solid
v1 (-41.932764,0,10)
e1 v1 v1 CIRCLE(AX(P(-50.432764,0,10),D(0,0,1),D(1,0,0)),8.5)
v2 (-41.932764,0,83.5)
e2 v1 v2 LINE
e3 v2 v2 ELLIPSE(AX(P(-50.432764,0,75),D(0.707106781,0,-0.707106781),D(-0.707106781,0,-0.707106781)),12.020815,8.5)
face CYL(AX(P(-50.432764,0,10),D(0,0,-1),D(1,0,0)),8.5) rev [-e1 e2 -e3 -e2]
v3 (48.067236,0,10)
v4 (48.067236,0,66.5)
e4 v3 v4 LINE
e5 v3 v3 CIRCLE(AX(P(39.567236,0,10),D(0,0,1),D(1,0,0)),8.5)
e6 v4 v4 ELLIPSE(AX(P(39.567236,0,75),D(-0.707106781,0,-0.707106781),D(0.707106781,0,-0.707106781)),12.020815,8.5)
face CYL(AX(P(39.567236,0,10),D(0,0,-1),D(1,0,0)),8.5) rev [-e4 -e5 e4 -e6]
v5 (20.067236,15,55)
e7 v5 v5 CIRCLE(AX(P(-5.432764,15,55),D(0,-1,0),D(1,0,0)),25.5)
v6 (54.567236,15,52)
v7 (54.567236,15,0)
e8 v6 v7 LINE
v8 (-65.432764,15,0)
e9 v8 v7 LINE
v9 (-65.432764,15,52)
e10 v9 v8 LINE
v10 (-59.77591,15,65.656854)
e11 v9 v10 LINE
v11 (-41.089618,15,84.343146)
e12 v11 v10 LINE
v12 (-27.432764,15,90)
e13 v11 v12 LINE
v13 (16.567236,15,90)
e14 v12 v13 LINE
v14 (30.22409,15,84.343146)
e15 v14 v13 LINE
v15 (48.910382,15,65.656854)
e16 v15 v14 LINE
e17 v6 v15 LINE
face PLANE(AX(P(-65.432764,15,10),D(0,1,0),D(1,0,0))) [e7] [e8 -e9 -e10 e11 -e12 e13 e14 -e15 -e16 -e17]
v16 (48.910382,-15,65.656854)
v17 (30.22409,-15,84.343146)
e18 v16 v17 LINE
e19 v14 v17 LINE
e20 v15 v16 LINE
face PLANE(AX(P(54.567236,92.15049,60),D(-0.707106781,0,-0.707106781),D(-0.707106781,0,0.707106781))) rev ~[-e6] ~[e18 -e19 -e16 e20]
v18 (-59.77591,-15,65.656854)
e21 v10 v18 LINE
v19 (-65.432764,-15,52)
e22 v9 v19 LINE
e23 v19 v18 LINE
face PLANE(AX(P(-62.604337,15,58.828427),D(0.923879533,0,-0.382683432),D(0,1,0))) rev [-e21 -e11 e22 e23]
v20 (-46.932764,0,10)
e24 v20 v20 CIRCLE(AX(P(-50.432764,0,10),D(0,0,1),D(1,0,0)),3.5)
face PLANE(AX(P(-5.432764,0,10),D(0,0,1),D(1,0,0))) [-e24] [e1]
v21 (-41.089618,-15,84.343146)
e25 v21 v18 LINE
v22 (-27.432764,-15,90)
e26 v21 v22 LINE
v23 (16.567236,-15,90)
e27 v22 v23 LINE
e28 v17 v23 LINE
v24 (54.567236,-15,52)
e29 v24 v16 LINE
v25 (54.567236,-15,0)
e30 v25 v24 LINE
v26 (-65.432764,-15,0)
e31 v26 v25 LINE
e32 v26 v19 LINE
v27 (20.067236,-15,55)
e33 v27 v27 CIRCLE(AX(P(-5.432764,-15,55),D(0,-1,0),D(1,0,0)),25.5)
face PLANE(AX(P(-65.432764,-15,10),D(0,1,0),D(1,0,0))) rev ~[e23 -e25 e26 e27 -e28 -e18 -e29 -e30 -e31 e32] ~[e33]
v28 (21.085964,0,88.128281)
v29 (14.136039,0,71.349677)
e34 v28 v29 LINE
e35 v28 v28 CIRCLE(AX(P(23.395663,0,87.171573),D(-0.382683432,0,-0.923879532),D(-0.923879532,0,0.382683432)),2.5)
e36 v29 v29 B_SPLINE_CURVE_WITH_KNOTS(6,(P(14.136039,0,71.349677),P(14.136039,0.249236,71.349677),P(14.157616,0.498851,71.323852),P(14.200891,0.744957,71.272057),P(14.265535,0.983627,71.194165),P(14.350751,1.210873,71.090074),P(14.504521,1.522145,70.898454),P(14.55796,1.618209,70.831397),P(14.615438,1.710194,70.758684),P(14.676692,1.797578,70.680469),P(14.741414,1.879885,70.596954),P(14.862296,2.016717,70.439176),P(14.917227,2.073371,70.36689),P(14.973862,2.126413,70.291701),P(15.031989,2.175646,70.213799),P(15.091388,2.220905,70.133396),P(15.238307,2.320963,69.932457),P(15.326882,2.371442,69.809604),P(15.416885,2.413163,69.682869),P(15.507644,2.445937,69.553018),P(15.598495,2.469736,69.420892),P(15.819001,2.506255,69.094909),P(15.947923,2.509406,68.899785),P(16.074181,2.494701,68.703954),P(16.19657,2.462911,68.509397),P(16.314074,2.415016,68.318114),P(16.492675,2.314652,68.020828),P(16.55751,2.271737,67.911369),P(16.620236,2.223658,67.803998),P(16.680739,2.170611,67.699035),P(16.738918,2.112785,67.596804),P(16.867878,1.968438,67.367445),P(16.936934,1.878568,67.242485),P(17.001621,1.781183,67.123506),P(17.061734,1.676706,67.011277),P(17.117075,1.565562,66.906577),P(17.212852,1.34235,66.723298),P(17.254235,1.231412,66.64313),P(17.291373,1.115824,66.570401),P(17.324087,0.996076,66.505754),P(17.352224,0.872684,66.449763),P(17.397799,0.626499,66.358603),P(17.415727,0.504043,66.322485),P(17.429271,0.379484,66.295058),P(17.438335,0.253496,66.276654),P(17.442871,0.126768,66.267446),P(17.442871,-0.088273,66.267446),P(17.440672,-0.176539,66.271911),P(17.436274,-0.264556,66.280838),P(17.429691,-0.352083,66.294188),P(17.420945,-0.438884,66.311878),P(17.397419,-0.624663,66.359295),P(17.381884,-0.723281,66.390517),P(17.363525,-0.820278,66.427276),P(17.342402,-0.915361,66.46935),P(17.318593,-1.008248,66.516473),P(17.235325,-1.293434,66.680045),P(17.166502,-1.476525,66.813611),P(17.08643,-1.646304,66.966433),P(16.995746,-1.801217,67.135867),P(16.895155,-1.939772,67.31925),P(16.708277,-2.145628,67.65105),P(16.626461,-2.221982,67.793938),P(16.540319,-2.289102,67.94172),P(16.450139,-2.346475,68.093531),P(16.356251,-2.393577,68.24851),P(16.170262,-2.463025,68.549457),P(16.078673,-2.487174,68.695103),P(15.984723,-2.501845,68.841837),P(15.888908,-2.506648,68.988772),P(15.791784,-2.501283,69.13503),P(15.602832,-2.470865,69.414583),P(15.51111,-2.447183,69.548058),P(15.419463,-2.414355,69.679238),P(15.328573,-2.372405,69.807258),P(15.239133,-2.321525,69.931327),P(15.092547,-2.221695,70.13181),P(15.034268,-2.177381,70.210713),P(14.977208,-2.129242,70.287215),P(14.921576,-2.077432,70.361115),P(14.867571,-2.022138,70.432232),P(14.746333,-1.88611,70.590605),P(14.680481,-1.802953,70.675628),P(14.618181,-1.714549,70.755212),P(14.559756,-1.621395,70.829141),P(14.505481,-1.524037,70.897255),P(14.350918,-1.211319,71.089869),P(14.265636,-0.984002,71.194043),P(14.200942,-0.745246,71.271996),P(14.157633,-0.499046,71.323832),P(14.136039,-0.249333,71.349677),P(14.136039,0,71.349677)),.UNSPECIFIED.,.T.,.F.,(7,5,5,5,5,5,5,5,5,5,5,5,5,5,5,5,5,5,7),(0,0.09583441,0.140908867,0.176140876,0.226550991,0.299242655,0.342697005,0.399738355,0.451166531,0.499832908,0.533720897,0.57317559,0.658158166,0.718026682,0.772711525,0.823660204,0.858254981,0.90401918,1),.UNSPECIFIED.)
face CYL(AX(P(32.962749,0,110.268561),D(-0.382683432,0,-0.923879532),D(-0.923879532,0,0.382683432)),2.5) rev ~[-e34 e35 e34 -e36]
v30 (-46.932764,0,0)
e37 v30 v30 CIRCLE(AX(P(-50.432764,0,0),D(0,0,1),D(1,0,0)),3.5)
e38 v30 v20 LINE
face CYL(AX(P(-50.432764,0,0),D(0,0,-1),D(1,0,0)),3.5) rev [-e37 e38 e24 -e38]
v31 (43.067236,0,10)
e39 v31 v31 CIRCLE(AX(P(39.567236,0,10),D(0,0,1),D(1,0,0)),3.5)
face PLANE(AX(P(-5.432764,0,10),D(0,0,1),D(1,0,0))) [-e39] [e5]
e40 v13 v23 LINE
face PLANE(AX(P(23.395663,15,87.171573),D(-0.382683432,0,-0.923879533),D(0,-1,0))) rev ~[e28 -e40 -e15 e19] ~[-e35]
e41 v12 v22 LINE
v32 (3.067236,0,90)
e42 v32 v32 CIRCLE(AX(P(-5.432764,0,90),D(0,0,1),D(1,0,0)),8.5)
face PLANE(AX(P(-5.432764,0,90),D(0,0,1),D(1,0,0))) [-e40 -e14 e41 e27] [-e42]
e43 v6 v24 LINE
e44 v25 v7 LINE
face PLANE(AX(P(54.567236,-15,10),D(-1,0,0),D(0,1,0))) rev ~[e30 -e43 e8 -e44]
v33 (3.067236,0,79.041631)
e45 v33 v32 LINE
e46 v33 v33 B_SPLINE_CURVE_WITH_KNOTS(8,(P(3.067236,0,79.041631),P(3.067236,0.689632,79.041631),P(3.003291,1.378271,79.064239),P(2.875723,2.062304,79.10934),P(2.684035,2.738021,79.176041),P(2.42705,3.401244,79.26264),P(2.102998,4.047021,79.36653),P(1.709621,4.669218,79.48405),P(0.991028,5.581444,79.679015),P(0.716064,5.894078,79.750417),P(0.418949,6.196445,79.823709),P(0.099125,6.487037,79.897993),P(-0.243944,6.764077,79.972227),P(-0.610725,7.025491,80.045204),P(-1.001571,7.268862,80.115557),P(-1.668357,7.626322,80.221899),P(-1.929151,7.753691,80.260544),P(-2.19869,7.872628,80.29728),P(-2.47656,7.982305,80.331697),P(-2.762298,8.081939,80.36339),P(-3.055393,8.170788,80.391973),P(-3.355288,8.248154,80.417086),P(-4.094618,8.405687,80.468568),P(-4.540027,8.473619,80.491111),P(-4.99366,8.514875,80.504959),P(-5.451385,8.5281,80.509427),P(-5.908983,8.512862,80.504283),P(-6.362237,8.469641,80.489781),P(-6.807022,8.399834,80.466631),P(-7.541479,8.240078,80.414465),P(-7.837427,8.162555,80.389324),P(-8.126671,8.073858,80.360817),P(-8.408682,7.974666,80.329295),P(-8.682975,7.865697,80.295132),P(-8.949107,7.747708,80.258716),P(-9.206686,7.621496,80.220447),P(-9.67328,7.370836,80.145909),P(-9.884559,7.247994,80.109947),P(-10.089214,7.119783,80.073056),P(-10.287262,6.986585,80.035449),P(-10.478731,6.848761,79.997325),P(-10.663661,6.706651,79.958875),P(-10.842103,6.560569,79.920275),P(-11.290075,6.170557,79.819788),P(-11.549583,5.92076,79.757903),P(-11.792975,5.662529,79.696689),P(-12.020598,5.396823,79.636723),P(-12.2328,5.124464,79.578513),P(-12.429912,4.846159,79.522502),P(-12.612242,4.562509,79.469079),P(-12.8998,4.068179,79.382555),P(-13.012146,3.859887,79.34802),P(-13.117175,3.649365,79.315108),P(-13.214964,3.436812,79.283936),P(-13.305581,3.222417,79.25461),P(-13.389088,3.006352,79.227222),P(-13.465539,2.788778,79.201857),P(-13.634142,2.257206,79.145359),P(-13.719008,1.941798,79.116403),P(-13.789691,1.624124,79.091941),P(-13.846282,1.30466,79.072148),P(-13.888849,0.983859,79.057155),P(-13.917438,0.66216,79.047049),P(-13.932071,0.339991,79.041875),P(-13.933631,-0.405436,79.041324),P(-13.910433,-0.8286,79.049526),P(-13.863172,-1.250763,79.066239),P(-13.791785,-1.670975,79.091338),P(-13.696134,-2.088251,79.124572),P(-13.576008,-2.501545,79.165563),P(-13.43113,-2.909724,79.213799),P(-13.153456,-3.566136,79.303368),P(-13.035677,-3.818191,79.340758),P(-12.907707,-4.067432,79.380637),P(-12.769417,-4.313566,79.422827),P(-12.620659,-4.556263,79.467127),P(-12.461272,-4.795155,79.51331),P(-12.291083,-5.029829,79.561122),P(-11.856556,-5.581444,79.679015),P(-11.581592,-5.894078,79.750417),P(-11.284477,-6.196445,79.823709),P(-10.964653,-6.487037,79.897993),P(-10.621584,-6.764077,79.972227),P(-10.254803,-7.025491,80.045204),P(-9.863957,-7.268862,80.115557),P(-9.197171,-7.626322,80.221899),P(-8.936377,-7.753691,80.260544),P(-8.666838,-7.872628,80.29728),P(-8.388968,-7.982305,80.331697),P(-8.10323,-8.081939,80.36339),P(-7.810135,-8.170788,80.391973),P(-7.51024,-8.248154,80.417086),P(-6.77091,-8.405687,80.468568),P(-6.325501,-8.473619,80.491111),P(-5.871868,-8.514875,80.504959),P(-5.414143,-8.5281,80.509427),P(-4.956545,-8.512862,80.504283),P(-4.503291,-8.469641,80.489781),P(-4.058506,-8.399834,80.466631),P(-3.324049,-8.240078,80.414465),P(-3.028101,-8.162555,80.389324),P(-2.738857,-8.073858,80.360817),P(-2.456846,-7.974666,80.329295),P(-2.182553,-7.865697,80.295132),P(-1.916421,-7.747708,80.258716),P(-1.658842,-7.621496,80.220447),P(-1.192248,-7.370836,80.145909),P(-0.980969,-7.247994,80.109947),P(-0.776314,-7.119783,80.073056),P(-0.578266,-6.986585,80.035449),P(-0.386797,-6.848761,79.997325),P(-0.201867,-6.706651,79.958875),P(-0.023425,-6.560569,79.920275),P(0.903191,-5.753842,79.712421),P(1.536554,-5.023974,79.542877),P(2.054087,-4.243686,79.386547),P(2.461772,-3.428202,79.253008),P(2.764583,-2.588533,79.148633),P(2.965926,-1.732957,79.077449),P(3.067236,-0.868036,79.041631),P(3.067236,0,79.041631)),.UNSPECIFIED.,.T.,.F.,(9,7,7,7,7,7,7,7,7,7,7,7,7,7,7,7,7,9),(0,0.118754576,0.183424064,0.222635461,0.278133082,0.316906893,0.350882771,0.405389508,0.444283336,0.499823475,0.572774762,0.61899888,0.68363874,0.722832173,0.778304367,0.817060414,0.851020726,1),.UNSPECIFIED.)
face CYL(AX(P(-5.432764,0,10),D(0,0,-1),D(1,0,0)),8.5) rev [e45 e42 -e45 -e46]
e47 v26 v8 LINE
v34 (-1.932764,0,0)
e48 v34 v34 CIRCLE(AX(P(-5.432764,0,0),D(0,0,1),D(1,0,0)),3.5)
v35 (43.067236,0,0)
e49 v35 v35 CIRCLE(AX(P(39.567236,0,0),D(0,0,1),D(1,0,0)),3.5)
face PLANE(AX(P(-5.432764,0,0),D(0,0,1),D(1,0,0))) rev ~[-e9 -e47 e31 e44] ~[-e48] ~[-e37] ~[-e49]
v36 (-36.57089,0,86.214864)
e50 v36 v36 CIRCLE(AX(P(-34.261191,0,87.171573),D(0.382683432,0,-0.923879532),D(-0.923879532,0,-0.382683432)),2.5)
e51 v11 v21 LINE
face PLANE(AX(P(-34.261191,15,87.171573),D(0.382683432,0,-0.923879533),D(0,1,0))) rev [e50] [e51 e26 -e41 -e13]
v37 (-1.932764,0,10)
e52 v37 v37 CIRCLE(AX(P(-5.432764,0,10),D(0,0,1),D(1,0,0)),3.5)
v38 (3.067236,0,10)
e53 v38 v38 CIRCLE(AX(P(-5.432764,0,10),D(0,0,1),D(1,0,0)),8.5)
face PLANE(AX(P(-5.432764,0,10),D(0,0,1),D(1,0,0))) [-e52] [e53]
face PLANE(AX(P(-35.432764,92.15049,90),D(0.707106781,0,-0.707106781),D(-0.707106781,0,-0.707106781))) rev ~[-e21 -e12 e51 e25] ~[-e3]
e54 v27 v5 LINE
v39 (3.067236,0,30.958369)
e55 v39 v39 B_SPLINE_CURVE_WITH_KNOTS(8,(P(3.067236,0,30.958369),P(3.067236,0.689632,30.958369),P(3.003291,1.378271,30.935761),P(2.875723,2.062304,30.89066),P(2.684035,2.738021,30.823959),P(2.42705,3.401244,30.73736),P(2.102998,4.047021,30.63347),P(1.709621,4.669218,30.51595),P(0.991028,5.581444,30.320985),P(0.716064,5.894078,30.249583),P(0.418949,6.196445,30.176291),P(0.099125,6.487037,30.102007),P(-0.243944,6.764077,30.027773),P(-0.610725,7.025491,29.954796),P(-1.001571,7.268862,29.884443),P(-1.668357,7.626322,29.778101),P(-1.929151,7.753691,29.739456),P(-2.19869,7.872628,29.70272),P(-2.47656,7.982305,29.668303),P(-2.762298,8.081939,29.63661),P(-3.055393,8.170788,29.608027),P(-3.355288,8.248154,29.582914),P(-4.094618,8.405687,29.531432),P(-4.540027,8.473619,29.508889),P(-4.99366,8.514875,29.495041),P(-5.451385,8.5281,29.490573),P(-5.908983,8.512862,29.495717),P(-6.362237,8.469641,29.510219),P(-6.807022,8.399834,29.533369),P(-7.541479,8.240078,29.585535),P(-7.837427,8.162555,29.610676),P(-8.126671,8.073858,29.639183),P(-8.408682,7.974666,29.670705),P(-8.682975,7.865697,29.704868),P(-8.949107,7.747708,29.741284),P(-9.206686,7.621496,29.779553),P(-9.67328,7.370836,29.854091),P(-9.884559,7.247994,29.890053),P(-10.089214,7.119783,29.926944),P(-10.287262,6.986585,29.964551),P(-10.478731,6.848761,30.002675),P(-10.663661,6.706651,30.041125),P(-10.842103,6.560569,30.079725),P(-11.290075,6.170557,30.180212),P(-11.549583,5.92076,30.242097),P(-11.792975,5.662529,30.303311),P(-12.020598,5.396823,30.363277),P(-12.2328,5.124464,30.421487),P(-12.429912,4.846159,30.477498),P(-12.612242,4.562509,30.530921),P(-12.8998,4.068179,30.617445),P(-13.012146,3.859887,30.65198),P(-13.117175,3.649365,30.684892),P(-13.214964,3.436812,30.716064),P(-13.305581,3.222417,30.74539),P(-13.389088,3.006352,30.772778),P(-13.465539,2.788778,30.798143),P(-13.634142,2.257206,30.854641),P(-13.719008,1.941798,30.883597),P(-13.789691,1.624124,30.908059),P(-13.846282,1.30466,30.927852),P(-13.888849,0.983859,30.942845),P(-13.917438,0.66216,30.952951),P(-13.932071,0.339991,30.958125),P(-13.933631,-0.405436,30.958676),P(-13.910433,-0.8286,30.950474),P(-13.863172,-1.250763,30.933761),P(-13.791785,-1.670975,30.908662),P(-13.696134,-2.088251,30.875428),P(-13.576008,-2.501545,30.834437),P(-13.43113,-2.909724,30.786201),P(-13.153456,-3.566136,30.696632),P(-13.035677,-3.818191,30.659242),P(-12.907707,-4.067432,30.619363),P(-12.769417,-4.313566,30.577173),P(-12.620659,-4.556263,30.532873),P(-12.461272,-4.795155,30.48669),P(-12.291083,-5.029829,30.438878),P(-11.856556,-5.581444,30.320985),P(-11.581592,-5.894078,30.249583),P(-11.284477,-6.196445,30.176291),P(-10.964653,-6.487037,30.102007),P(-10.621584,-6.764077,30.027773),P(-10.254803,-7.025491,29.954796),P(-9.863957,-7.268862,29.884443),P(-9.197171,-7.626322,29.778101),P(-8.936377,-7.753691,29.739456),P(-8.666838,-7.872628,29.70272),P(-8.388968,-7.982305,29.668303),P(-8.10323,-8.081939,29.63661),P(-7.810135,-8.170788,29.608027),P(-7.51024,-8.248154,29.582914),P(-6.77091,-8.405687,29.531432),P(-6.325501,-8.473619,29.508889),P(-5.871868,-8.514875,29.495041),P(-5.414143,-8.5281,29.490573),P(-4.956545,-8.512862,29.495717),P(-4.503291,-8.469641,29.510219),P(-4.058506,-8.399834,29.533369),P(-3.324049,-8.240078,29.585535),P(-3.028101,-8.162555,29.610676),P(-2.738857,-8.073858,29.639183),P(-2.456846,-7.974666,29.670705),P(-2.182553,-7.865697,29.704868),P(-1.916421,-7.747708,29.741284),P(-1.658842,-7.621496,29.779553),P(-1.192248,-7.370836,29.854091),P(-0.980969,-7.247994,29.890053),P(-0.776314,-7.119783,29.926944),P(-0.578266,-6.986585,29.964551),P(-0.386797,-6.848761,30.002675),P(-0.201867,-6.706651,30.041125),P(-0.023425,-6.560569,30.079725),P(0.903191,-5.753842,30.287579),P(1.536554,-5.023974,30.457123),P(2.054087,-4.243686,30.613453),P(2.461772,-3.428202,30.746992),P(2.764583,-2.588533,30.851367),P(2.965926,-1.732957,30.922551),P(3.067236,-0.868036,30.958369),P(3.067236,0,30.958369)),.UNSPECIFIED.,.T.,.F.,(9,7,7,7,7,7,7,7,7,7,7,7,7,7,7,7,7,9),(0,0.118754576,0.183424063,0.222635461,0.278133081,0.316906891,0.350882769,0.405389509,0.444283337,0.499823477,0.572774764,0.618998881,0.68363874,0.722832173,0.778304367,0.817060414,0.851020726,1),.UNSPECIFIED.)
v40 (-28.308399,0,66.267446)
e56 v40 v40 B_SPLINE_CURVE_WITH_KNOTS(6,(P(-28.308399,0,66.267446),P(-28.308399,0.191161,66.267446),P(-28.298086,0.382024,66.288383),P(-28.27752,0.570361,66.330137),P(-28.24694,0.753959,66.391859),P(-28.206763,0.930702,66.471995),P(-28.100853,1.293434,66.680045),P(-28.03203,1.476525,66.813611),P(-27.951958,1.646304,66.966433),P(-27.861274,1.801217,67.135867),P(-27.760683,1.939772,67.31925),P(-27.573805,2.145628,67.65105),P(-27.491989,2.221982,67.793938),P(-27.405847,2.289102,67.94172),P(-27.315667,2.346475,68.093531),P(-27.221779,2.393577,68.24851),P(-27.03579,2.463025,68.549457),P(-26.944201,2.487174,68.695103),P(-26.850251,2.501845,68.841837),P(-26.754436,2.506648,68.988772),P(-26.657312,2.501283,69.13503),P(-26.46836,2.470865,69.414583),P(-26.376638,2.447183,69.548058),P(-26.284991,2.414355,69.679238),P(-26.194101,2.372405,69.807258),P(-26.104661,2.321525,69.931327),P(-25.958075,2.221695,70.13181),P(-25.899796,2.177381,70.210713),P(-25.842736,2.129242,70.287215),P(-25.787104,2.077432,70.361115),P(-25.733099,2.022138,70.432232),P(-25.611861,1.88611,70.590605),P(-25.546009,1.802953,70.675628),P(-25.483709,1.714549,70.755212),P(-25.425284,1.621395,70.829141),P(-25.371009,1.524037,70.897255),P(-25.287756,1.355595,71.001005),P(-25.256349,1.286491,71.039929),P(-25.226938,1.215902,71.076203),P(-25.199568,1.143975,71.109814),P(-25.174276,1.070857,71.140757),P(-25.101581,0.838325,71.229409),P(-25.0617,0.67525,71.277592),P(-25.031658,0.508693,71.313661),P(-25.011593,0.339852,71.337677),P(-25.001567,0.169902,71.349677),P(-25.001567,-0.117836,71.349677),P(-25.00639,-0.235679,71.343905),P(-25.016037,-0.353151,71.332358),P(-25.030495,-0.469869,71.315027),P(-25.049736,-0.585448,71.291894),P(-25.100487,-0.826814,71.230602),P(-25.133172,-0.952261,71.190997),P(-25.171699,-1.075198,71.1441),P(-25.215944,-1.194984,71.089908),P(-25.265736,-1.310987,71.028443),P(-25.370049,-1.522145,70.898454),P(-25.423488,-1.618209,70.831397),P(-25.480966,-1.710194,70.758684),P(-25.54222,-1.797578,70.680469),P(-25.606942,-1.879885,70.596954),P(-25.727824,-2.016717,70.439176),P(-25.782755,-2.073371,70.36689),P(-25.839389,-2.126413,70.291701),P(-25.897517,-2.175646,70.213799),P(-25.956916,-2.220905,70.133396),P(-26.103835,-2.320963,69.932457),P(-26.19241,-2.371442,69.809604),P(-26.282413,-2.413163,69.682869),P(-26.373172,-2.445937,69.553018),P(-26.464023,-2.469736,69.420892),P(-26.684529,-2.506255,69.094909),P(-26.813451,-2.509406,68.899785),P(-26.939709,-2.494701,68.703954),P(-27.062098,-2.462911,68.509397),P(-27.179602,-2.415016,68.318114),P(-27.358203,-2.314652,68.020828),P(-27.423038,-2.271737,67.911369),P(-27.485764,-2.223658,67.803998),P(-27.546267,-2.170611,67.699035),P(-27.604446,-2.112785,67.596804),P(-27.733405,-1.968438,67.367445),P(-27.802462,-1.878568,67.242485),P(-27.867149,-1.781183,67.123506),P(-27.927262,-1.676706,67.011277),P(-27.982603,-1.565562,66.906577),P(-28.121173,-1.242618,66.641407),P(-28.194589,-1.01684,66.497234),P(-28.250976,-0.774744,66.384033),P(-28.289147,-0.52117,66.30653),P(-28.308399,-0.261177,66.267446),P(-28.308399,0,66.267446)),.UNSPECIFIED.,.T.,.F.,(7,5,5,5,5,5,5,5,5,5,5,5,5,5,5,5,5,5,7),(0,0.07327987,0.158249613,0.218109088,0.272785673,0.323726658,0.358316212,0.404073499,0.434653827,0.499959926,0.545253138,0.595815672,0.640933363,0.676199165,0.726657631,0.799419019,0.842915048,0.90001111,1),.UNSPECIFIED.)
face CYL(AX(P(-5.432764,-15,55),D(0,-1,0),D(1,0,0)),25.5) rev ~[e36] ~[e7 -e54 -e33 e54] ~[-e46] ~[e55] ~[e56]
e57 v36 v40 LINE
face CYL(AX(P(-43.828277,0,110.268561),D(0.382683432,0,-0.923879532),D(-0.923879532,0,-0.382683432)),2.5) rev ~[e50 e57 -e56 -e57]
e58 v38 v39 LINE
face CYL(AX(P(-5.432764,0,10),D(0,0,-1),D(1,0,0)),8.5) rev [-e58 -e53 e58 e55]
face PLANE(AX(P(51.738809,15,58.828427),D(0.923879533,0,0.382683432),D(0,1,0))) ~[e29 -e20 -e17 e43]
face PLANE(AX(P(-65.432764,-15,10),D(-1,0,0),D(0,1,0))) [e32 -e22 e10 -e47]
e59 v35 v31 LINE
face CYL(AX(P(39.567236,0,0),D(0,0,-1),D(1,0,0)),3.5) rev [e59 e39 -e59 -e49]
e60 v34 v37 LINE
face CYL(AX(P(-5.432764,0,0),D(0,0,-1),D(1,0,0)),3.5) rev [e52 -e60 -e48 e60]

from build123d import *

# Parameters (mm, degrees)
F0_W            = 120
F0_H            = 30
F0_R            = 3.5
F1_DEPTH        = 10
F2_W            = 120
F2_H            = 30
F2_R            = 8.5
F3_DEPTH        = 80
F4_R            = 25.5
F5_DEPTH        = 30
F6_T1_DEPTH     = 184.300979278
F7_SIZE         = 8
F10_D           = 5
F10_DEPTH       = 25
F10_TIP         = 1.5021515476
F10_ON_F9_D     = 5
F10_ON_F9_DEPTH = 25
F10_ON_F9_TIP   = 1.5021515476


# Not quite as in the source:
# - a fillet or chamfer that OpenCascade refuses, or shapes differently, is made with other operations: its cross-section is extruded or revolved along the edge and cut away or added


with BuildPart() as f1:
    # F0 (on Top) → F1 (new body)
    with BuildSketch(Plane.XY):
        with Locations((-5.4327639937, 0)):
            Rectangle(F0_W, F0_H)
        with Locations((-50.4327639937, 0)):
            Circle(F0_R, mode=Mode.SUBTRACT)
        with Locations((-5.4327639937, 0)):
            Circle(F0_R, mode=Mode.SUBTRACT)
        with Locations((39.5672360063, 0)):
            Circle(F0_R, mode=Mode.SUBTRACT)
    extrude(amount=F1_DEPTH)

    # F2 (on face) → F3 (join)
    with BuildSketch(Plane.XY.offset(10)):
        with Locations((-5.4327639937, 0)):
            Rectangle(F2_W, F2_H)
        with Locations((-50.4327639937, 0)):
            Circle(F2_R, mode=Mode.SUBTRACT)
        with Locations((-5.4327639937, 0)):
            Circle(F2_R, mode=Mode.SUBTRACT)
        with Locations((39.5672360063, 0)):
            Circle(F2_R, mode=Mode.SUBTRACT)
    extrude(amount=F3_DEPTH)

    # F4 (on face) → F5 (cut)
    with BuildSketch(Plane.XZ.offset(15)):
        with Locations((-5.4327639937, 55)):
            Circle(F4_R)
    extrude(amount=-F5_DEPTH, mode=Mode.SUBTRACT)

    # F6: chamfer of 30 on 2 edges, made by hand

    # F6_s2 → F6_t1 (cut)
    with BuildSketch(Plane.XZ.offset(-92.150489639)):
        Polygon((-35.4327639937, 90), (-65.4327639937, 60), (-65.4327639937, 90), align=None)
        Polygon((54.5672360063, 60), (24.5672360063, 90), (54.5672360063, 90), align=None)
    extrude(amount=F6_T1_DEPTH, mode=Mode.SUBTRACT)

    # F7
    f7_edges = [f1.edges().sort_by_distance(p)[0] for p in [
        (-65.432764, 0, 60),
        (-35.432764, 0, 90),
        (24.567236, 0, 90),
        (54.567236, 0, 60),
    ]]
    chamfer(f7_edges, length=F7_SIZE)

    # F10
    with Locations(Plane(origin=(-35.8372404269, 0, 86.5187518767), x_dir=(0.9238795325, 0, 0.3826834324), z_dir=(-0.3826834324, 0, 0.9238795325))):
        with Locations((1.7059034787, 0)):
            Hole(F10_D / 2, depth=F10_DEPTH)
            with Locations((0, 0, -(F10_DEPTH + F10_TIP / 2))):  # 118° drill point
                Cone(0, F10_D / 2, F10_TIP, mode=Mode.SUBTRACT)

    # F10 on F9
    with Locations(Plane(origin=(34.2460206938, 0, 82.6772076162), x_dir=(0.9238795325, 0, -0.3826834324), z_dir=(0.3826834324, 0, 0.9238795325))):
        with Locations((-11.7443423963, 0)):
            Hole(F10_ON_F9_D / 2, depth=F10_ON_F9_DEPTH)
            with Locations((0, 0, -(F10_ON_F9_DEPTH + F10_ON_F9_TIP / 2))):  # 118° drill point
                Cone(0, F10_ON_F9_D / 2, F10_ON_F9_TIP, mode=Mode.SUBTRACT)


solid = f1.part
